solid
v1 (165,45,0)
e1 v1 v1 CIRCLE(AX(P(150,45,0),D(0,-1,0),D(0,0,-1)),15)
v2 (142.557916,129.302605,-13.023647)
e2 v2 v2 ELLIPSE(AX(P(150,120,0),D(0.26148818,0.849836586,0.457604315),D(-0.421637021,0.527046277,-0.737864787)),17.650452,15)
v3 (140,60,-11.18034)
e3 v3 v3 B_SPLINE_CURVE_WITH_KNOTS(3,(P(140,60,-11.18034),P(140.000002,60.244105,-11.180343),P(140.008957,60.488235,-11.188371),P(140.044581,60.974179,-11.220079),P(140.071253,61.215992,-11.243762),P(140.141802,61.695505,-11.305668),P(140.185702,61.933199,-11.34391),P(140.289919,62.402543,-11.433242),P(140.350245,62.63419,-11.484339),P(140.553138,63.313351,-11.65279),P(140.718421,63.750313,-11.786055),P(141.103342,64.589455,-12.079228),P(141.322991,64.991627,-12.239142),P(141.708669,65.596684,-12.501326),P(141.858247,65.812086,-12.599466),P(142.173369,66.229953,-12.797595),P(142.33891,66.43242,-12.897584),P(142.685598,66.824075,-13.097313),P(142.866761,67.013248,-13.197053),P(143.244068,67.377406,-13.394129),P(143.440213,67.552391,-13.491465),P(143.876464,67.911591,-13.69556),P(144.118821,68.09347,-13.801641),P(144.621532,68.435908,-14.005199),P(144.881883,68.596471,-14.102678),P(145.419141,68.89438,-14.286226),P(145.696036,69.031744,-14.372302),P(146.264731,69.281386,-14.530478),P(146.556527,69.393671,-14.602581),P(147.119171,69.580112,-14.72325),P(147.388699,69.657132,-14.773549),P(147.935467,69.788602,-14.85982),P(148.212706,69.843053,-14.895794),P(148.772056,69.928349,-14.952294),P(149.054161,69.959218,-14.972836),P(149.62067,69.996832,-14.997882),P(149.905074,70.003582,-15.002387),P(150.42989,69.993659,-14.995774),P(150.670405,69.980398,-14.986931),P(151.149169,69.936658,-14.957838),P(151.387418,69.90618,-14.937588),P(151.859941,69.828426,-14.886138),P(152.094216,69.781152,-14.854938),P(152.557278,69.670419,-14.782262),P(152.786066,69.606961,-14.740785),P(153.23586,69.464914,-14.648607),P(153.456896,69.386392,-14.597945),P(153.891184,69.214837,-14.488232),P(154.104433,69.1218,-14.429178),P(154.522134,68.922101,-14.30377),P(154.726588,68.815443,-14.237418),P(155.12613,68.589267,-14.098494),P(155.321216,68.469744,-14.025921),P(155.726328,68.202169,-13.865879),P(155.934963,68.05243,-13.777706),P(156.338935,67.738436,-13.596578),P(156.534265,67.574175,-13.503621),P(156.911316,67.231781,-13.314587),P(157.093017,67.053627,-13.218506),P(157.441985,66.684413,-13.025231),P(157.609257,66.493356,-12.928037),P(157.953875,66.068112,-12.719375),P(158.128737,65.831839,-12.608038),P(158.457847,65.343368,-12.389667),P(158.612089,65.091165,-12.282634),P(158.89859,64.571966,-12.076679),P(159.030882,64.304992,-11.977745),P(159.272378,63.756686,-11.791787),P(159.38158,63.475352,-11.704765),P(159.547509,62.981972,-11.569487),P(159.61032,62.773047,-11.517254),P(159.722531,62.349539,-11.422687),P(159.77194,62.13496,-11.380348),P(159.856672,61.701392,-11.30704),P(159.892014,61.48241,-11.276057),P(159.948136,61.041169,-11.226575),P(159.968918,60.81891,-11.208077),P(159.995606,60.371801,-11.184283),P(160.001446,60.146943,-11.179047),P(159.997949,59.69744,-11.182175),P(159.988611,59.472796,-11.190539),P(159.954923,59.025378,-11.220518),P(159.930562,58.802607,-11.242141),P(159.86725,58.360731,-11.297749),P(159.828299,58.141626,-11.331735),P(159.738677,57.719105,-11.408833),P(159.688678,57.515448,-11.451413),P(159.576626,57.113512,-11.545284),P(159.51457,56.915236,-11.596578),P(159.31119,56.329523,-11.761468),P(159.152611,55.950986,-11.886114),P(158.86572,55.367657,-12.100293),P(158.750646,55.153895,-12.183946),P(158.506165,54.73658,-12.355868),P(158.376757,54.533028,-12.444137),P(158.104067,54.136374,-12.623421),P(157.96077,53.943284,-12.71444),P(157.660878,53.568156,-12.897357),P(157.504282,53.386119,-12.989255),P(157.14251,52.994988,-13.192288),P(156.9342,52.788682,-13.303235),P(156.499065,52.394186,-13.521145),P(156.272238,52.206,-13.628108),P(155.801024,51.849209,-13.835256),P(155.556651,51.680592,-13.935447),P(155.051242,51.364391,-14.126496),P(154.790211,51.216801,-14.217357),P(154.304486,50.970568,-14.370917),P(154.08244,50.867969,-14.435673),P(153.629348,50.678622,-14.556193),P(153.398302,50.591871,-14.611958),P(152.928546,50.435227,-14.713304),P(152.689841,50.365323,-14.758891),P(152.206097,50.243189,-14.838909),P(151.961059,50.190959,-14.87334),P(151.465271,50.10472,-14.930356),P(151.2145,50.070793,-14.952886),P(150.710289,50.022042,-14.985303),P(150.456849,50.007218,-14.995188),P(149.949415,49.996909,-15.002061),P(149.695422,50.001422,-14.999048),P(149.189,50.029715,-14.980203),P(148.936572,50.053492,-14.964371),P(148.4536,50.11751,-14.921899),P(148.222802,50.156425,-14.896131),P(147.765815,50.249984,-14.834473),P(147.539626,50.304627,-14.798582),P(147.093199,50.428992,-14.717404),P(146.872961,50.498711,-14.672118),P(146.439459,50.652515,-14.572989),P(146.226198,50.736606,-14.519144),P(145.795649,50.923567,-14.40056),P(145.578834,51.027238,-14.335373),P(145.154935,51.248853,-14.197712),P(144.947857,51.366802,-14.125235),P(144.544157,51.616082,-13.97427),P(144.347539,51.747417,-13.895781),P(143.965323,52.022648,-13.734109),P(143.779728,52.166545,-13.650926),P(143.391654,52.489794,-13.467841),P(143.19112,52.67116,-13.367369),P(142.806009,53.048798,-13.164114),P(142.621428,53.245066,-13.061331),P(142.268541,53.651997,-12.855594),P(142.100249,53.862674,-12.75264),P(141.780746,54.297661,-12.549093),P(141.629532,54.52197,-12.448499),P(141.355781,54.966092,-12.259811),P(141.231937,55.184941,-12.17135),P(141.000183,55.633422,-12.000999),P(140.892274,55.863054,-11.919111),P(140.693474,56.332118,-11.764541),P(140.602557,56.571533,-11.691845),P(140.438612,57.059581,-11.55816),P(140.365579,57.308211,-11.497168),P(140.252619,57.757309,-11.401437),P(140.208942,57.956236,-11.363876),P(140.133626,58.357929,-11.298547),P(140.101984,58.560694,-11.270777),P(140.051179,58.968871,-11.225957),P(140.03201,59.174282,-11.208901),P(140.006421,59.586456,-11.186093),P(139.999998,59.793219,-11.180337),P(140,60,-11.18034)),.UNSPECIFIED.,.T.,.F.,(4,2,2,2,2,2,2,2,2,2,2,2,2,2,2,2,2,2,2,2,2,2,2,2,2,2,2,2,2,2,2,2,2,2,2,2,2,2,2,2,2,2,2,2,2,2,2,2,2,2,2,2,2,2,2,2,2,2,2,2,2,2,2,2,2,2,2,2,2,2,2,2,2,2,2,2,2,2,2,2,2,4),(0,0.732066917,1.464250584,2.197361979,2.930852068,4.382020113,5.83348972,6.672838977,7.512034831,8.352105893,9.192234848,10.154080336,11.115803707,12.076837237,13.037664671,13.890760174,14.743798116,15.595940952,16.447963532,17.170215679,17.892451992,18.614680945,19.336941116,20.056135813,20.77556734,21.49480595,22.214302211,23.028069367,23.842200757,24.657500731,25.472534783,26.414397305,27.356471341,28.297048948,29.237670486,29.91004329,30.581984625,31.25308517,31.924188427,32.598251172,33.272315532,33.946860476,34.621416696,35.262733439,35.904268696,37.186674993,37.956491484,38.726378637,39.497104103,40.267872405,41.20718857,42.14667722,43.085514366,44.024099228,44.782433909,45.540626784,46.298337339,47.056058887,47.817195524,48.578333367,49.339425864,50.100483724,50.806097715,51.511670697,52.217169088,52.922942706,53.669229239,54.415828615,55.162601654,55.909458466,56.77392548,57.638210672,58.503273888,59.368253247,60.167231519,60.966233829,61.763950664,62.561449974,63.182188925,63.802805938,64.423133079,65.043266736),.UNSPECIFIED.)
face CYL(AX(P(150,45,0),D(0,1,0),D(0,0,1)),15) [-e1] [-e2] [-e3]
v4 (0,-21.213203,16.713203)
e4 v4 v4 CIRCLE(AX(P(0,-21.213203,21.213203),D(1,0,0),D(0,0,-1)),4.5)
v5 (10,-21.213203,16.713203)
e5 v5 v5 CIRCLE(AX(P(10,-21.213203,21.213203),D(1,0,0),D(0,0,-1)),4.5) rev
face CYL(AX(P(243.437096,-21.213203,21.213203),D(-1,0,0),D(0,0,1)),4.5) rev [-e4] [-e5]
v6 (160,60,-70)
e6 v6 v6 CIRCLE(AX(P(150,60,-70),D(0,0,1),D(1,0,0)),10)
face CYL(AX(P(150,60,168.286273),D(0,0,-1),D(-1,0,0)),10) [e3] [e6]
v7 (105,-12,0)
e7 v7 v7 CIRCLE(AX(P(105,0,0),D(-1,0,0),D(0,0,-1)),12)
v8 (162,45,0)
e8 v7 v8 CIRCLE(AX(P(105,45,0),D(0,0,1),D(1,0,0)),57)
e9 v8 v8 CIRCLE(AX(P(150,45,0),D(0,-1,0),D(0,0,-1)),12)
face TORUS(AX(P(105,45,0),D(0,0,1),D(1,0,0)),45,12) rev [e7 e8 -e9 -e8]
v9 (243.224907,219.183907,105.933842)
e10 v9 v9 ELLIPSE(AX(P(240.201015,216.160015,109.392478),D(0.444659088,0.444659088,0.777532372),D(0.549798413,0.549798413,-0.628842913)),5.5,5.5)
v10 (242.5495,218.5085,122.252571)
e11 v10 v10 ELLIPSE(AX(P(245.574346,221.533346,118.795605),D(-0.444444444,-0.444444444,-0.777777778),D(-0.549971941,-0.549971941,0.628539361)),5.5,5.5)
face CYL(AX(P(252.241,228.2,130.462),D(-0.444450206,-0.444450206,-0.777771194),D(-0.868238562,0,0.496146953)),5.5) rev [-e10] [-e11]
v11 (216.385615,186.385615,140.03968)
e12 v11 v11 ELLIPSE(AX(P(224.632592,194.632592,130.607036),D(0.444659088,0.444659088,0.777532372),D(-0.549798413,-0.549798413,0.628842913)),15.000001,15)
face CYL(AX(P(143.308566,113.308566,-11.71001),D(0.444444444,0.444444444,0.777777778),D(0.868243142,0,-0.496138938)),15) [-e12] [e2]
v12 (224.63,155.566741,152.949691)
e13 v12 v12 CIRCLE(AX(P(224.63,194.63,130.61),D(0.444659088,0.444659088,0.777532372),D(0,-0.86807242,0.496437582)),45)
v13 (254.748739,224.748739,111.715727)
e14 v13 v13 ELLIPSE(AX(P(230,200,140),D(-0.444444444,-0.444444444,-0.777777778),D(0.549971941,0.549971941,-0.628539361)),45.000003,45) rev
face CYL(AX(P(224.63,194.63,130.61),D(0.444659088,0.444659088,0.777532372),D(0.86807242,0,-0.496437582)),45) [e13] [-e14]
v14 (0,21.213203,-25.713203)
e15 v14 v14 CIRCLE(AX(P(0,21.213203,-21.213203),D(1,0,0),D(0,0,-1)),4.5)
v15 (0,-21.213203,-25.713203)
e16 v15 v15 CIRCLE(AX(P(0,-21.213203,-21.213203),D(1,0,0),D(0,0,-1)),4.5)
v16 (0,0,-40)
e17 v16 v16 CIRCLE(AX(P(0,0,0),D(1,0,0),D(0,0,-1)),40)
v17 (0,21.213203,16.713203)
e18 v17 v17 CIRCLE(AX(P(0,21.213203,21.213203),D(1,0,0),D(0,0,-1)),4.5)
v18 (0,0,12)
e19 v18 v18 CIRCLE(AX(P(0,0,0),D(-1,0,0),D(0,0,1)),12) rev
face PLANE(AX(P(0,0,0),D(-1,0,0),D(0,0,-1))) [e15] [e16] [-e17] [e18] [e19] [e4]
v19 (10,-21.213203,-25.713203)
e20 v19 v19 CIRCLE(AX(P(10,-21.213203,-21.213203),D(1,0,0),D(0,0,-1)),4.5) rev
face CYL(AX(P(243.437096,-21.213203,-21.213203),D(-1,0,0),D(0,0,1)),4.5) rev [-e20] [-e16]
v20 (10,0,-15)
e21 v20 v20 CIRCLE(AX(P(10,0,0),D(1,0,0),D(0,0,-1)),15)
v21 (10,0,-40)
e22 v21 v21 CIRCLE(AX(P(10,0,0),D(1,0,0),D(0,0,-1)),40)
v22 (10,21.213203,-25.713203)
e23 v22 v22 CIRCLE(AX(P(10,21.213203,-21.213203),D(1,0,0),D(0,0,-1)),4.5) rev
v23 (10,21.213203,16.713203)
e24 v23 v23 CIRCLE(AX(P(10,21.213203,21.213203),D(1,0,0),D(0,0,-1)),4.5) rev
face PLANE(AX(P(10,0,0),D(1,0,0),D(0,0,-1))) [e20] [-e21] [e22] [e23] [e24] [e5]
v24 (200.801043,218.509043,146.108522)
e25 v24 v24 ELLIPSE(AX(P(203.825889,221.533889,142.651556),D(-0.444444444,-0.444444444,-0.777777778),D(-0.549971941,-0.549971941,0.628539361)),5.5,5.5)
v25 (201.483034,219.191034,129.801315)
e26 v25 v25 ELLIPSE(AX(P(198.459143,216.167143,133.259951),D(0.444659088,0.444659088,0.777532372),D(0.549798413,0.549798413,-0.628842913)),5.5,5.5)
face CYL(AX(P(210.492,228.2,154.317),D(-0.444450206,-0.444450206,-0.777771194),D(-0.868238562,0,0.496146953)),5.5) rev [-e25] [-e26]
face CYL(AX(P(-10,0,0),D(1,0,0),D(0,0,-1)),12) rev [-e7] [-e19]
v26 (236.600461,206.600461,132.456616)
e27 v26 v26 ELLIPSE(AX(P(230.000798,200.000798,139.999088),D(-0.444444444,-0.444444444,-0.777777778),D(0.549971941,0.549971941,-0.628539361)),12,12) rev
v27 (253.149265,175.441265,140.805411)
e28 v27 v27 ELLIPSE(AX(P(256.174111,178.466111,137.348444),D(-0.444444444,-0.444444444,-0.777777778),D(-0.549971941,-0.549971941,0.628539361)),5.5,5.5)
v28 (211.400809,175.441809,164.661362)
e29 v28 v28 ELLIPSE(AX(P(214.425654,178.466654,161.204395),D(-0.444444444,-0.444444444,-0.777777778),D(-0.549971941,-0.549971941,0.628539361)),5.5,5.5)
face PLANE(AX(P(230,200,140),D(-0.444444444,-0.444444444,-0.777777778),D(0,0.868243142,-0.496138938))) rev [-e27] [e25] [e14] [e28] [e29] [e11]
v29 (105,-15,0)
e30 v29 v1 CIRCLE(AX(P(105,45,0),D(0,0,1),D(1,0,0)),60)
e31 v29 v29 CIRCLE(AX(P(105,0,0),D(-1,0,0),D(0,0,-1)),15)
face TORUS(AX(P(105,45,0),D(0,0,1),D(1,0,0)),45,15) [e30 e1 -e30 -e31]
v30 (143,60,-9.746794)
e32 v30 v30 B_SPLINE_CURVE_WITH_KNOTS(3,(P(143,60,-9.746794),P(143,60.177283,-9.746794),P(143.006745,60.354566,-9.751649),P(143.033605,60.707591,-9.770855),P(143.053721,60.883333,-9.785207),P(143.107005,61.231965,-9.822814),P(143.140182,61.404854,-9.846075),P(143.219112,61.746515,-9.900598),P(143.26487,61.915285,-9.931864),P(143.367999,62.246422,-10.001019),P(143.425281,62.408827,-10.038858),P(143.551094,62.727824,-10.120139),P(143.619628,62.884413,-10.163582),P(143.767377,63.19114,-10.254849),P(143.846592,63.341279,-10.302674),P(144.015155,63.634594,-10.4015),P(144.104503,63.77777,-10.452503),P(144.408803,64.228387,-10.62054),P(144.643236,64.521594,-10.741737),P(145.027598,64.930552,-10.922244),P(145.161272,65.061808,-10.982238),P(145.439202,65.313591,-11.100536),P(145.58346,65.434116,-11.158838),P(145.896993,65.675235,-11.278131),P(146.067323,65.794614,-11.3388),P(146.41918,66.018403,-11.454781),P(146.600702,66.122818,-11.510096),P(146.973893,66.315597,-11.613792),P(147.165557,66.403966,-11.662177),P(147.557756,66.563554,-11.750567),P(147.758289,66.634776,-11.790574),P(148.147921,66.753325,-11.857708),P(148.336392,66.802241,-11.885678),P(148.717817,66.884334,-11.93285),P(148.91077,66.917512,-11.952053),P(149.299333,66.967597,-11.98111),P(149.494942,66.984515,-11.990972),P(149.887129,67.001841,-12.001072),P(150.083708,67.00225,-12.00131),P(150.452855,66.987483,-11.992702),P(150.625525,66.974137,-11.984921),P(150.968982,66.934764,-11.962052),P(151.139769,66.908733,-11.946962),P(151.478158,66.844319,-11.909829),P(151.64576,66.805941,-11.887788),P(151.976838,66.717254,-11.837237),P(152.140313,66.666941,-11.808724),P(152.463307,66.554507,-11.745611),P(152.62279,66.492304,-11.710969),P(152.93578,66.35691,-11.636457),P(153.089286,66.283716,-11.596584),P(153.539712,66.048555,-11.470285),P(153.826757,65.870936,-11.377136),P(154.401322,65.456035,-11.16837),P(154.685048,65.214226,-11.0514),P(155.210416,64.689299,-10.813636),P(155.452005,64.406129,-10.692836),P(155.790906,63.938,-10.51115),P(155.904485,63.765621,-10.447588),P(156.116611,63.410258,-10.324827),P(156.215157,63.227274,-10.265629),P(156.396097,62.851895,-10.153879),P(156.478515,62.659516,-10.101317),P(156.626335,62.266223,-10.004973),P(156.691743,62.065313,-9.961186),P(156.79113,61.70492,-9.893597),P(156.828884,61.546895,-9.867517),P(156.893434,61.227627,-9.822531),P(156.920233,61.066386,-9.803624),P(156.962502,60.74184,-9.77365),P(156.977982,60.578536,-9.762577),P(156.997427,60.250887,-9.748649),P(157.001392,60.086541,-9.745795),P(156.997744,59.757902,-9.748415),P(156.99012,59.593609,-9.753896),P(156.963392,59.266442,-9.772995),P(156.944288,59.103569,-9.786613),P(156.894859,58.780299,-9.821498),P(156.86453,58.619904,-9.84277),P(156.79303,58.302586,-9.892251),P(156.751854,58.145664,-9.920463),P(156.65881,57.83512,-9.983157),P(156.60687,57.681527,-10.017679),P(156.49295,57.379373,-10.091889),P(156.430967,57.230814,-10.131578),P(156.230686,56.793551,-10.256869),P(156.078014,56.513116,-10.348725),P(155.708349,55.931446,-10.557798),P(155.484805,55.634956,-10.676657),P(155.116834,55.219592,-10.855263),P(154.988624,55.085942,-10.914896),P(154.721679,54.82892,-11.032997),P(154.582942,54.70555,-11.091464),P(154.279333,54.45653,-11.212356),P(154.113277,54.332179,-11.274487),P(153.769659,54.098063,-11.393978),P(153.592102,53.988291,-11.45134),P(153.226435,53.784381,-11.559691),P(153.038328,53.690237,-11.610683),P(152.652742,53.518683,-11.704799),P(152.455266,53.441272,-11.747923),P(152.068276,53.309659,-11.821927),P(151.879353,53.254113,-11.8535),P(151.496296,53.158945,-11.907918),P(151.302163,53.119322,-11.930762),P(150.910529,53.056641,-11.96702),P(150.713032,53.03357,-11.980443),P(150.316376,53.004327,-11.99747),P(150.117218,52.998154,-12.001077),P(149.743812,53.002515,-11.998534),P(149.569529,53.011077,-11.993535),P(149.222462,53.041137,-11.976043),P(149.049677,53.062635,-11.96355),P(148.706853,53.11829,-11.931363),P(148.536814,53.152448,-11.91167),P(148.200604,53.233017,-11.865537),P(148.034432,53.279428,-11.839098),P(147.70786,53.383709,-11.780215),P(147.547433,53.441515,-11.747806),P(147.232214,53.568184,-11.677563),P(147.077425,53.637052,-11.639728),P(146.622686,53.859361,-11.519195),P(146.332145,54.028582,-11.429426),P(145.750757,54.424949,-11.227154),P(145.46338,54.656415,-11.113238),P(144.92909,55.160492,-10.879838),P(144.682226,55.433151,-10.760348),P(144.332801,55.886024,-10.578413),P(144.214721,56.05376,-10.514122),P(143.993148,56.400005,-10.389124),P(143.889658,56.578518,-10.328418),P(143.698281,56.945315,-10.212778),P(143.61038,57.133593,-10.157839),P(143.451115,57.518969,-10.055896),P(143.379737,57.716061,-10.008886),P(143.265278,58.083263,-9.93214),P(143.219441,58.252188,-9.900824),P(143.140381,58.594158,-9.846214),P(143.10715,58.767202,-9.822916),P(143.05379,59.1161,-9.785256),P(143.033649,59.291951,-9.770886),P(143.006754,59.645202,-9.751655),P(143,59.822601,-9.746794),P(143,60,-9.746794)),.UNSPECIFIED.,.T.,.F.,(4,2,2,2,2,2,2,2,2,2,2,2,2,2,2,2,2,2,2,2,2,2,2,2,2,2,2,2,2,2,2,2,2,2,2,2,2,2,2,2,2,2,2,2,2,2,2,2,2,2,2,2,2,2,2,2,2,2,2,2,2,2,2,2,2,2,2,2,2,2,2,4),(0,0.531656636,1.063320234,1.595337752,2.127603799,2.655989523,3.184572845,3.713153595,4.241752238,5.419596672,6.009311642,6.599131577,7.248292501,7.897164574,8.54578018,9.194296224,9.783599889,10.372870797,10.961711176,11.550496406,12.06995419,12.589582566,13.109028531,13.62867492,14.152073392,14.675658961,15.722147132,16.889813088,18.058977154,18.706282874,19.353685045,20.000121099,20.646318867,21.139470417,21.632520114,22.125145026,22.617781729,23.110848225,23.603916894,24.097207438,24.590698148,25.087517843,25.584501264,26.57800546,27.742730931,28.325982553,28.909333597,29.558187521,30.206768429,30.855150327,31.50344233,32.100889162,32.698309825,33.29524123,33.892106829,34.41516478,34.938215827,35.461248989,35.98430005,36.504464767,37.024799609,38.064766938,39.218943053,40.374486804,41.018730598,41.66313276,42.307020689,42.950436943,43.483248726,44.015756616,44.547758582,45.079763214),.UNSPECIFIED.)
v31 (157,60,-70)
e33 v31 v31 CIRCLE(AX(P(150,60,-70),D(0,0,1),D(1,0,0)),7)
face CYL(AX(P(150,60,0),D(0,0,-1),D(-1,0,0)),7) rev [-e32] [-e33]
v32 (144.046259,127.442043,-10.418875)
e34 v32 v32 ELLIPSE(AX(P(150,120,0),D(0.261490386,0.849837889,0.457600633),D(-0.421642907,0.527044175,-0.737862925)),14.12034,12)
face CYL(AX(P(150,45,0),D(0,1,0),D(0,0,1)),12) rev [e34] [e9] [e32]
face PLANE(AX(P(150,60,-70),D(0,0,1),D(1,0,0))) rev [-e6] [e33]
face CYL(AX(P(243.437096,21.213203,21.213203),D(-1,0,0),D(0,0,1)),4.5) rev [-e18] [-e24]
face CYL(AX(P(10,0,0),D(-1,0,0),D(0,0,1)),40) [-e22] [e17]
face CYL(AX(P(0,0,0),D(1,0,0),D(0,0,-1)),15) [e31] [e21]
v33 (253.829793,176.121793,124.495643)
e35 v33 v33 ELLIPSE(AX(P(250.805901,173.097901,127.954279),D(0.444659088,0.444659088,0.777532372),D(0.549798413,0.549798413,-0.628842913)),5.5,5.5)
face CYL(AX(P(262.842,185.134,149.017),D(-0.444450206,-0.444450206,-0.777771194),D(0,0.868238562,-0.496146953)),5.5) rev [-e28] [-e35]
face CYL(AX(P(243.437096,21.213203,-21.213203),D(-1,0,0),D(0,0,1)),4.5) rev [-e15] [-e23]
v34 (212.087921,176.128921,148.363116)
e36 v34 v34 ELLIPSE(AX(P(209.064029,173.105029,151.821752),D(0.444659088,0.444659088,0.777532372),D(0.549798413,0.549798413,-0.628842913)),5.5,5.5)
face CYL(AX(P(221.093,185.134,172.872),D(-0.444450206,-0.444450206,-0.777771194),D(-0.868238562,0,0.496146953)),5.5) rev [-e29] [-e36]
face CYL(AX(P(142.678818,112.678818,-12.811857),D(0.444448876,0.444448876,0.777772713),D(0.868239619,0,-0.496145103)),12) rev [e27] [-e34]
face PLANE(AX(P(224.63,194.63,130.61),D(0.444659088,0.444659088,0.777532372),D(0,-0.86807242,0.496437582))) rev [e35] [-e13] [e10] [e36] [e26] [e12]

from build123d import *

# Parameters (mm, degrees)
SWEEP_2_PROFILE_R    = 15
SWEEP_6_PROFILE_R    = 15
SKETCH_7_R           = 40
EXTRUDE_2_DEPTH      = 10
SKETCH_8_R           = 4.5
CUT_EXTRUDE_1_DEPTH  = 357.575052533
SWEEP_START          = 287.981272568
SWEEP_8_OUTLINE_R    = 45
SWEEP_8_DEPTH        = 12.094233032
SWEEP_START_2        = 300
SWEEP_8_2_OUTLINE_W  = 93
SWEEP_8_2_OUTLINE_H  = 93
SWEEP_8_2_DEPTH      = 1
EXTRUDE_3_REACH      = 435.125
EXTRUDE_3_END_RADIUS = 15
SKETCH_15_R          = 10
SWEEP_2_2_PROFILE_R  = 12
SWEEP_4_PROFILE_R    = 12
SKETCH_19_R          = 7
CUT_EXTRUDE_2_DEPTH  = 70
SWEEP_14_PROFILE_R   = 5.5
SWEEP_16_PROFILE_R   = 5.5
SWEEP_18_PROFILE_R   = 5.5
SWEEP_20_PROFILE_R   = 5.5


with BuildPart() as part:
    # Sweep 2: sweep along a path in 草图1
    with BuildLine(Plane.XY) as sweep_2_path:
        Line((0, 0), (105, 0))
        ThreePointArc((105, 0), (136.819805153, 13.180194847), (150, 45))
        Line((150, 45), (150, 77.56))
    # Sweep 2 profile (on start of the path) → Sweep 2 (sweep)
    with BuildSketch(Plane(origin=(0, 0, 0), x_dir=(0, 0, 1), z_dir=(1, 0, 0))):
        Circle(SWEEP_2_PROFILE_R)
    sweep(path=sweep_2_path.line)

    # 扫描6: sweep along a curve in space
    with BuildLine() as sweep_6_path:
        Line((150, 50, 0), (150, 120, 0))
        Line((150, 120, 0), (230, 200, 140))
    # 扫描6 profile (on start of the path) → 扫描6 (sweep)
    with BuildSketch(Plane(origin=(150, 50, 0), x_dir=(0, 0, 1), z_dir=(0, 1, 0))):
        Circle(SWEEP_6_PROFILE_R)
    sweep(path=sweep_6_path.line, transition=Transition.RIGHT)

    # 草图7 → 凸台-拉伸2 (add)
    with BuildSketch(Plane(origin=(0, 0, 0), x_dir=(0, 0, -1), z_dir=(1, 0, 0))):
        Circle(SKETCH_7_R)
    extrude(amount=EXTRUDE_2_DEPTH)

    # 草图8 → 切除-拉伸1 (cut, through all)
    with BuildSketch(Plane(origin=(0, 0, 0), x_dir=(0, 0, -1), z_dir=(1, 0, 0))):
        with Locations((-21.213203, 21.213203)):
            Circle(SKETCH_8_R)
        with Locations((21.213203, 21.213203)):
            Circle(SKETCH_8_R)
        with Locations((21.213203, -21.213203)):
            Circle(SKETCH_8_R)
        with Locations((-21.213203, -21.213203)):
            Circle(SKETCH_8_R)
    extrude(amount=CUT_EXTRUDE_1_DEPTH, mode=Mode.SUBTRACT)

    # 扫描8: read off the stored shape, not the designer's step
    # 扫描8 outline → 扫描8 (add)
    with BuildSketch(Plane(origin=(0, 0, 0), x_dir=(0.8956998912049878, -0.22074548276362646, -0.38599629108946926), z_dir=(0.4446590883984862, 0.4446590883984862, 0.7775323724509833)).offset(SWEEP_START)):
        with Locations((107.822397672, 104.113222554)):
            Circle(SWEEP_8_OUTLINE_R)
    extrude(amount=SWEEP_8_DEPTH)

    # Sweep 8 2 outline → Sweep 8 2 (cut)
    with BuildSketch(Plane(origin=(0, 0, 0), x_dir=(0.8958064164776169, -0.2205061948252594, -0.3858858409442036), z_dir=(0.4444444444444439, 0.4444444444444449, 0.7777777777777779)).offset(SWEEP_START_2)):
        with Locations((107.5, 104.5)):
            Rectangle(SWEEP_8_2_OUTLINE_W, SWEEP_8_2_OUTLINE_H)
    extrude(amount=SWEEP_8_2_DEPTH, mode=Mode.SUBTRACT)

    # 凸台-拉伸3: up to this cylinder (the profile starts outside it)
    extrude_3_end = Plane(origin=(150, 60, 0), z_dir=(0, 1, 0)) * Cylinder(EXTRUDE_3_END_RADIUS, 901.25, mode=Mode.PRIVATE)
    # 草图15 → 凸台-拉伸3 (add, up to the surface)
    with BuildSketch(Plane.XY.offset(-70), mode=Mode.PRIVATE) as extrude_3_sk1:
        with Locations(Location((150, 60, 0), (0, 0, 180))):
            Circle(SKETCH_15_R)
    extrude_3_tool1 = extrude(extrude_3_sk1.sketch, amount=EXTRUDE_3_REACH, mode=Mode.PRIVATE) - extrude_3_end
    add(extrude_3_tool1.solids().sort_by_distance((150, 60, -70))[0])

    # Sweep 2 2: sweep along a path in 草图16
    with BuildLine(Plane.XY) as sweep_2_2_path:
        Line((-10, 0), (105, 0))
        ThreePointArc((105, 0), (136.819805153, 13.180194847), (150, 45))
        Line((150, 45), (150, 77.56))
    # Sweep 2 2 profile (on start of the path) → Sweep 2 2 (sweep, cut)
    with BuildSketch(Plane(origin=(-10, 0, 0), x_dir=(0, 0, 1), z_dir=(1, 0, 0))):
        Circle(SWEEP_2_2_PROFILE_R)
    sweep(path=sweep_2_2_path.line, mode=Mode.SUBTRACT)

    # 切除-扫描4: sweep along a curve in space
    with BuildLine() as sweep_4_path:
        Line((150, 50, 0), (150, 120, 0))
        Line((150, 120, 0), (236.67, 206.67, 151.67))
    # 切除-扫描4 profile (on start of the path) → 切除-扫描4 (sweep, cut)
    with BuildSketch(Plane(origin=(150, 50, 0), x_dir=(0, 0, 1), z_dir=(0, 1, 0))):
        Circle(SWEEP_4_PROFILE_R)
    sweep(path=sweep_4_path.line, transition=Transition.RIGHT, mode=Mode.SUBTRACT)

    # 草图19 → 切除-拉伸2 (cut)
    with BuildSketch(Plane.XY.offset(-70)):
        with Locations(Location((150, 60, 0), (0, 0, 180))):
            Circle(SKETCH_19_R)
    extrude(amount=CUT_EXTRUDE_2_DEPTH, mode=Mode.SUBTRACT)

    # 切除-扫描14: sweep along a curve in space
    with BuildLine() as sweep_14_path:
        Line((262.842, 185.134, 149.017), (249.508, 171.8, 125.683))
    # 切除-扫描14 profile (on start of the path) → 切除-扫描14 (sweep, cut)
    with BuildSketch(Plane(origin=(262.842, 185.134, 149.017), x_dir=(-0.8682385624984269, 0, 0.4961469526165259), z_dir=(-0.4444502055235574, -0.4444502055235574, -0.7777711936168215))):
        Circle(SWEEP_14_PROFILE_R)
    sweep(path=sweep_14_path.line, mode=Mode.SUBTRACT)

    # 切除-扫描16: sweep along a curve in space
    with BuildLine() as sweep_16_path:
        Line((252.241, 228.2, 130.462), (238.907, 214.866, 107.128))
    # 切除-扫描16 profile (on start of the path) → 切除-扫描16 (sweep, cut)
    with BuildSketch(Plane(origin=(252.241, 228.2, 130.462), x_dir=(-0.868238562498427, 0, 0.4961469526165257), z_dir=(-0.4444502055235573, -0.4444502055235573, -0.7777711936168217))):
        Circle(SWEEP_16_PROFILE_R)
    sweep(path=sweep_16_path.line, mode=Mode.SUBTRACT)

    # 切除-扫描18: sweep along a curve in space
    with BuildLine() as sweep_18_path:
        Line((210.492, 228.2, 154.317), (197.158, 214.866, 130.983))
    # 切除-扫描18 profile (on start of the path) → 切除-扫描18 (sweep, cut)
    with BuildSketch(Plane(origin=(210.492, 228.2, 154.317), x_dir=(-0.8682385624984262, 0, 0.496146952616527), z_dir=(-0.44445020552355863, -0.44445020552355674, -0.7777711936168212))):
        Circle(SWEEP_18_PROFILE_R)
    sweep(path=sweep_18_path.line, mode=Mode.SUBTRACT)

    # 切除-扫描20: sweep along a curve in space
    with BuildLine() as sweep_20_path:
        Line((221.093, 185.134, 172.872), (207.759, 171.8, 149.538))
    # 切除-扫描20 profile (on start of the path) → 切除-扫描20 (sweep, cut)
    with BuildSketch(Plane(origin=(221.093, 185.134, 172.872), x_dir=(-0.8682385624984266, 0, 0.4961469526165266), z_dir=(-0.4444502055235583, -0.44445020552355635, -0.7777711936168216))):
        Circle(SWEEP_20_PROFILE_R)
    sweep(path=sweep_20_path.line, mode=Mode.SUBTRACT)


solid = part.part
